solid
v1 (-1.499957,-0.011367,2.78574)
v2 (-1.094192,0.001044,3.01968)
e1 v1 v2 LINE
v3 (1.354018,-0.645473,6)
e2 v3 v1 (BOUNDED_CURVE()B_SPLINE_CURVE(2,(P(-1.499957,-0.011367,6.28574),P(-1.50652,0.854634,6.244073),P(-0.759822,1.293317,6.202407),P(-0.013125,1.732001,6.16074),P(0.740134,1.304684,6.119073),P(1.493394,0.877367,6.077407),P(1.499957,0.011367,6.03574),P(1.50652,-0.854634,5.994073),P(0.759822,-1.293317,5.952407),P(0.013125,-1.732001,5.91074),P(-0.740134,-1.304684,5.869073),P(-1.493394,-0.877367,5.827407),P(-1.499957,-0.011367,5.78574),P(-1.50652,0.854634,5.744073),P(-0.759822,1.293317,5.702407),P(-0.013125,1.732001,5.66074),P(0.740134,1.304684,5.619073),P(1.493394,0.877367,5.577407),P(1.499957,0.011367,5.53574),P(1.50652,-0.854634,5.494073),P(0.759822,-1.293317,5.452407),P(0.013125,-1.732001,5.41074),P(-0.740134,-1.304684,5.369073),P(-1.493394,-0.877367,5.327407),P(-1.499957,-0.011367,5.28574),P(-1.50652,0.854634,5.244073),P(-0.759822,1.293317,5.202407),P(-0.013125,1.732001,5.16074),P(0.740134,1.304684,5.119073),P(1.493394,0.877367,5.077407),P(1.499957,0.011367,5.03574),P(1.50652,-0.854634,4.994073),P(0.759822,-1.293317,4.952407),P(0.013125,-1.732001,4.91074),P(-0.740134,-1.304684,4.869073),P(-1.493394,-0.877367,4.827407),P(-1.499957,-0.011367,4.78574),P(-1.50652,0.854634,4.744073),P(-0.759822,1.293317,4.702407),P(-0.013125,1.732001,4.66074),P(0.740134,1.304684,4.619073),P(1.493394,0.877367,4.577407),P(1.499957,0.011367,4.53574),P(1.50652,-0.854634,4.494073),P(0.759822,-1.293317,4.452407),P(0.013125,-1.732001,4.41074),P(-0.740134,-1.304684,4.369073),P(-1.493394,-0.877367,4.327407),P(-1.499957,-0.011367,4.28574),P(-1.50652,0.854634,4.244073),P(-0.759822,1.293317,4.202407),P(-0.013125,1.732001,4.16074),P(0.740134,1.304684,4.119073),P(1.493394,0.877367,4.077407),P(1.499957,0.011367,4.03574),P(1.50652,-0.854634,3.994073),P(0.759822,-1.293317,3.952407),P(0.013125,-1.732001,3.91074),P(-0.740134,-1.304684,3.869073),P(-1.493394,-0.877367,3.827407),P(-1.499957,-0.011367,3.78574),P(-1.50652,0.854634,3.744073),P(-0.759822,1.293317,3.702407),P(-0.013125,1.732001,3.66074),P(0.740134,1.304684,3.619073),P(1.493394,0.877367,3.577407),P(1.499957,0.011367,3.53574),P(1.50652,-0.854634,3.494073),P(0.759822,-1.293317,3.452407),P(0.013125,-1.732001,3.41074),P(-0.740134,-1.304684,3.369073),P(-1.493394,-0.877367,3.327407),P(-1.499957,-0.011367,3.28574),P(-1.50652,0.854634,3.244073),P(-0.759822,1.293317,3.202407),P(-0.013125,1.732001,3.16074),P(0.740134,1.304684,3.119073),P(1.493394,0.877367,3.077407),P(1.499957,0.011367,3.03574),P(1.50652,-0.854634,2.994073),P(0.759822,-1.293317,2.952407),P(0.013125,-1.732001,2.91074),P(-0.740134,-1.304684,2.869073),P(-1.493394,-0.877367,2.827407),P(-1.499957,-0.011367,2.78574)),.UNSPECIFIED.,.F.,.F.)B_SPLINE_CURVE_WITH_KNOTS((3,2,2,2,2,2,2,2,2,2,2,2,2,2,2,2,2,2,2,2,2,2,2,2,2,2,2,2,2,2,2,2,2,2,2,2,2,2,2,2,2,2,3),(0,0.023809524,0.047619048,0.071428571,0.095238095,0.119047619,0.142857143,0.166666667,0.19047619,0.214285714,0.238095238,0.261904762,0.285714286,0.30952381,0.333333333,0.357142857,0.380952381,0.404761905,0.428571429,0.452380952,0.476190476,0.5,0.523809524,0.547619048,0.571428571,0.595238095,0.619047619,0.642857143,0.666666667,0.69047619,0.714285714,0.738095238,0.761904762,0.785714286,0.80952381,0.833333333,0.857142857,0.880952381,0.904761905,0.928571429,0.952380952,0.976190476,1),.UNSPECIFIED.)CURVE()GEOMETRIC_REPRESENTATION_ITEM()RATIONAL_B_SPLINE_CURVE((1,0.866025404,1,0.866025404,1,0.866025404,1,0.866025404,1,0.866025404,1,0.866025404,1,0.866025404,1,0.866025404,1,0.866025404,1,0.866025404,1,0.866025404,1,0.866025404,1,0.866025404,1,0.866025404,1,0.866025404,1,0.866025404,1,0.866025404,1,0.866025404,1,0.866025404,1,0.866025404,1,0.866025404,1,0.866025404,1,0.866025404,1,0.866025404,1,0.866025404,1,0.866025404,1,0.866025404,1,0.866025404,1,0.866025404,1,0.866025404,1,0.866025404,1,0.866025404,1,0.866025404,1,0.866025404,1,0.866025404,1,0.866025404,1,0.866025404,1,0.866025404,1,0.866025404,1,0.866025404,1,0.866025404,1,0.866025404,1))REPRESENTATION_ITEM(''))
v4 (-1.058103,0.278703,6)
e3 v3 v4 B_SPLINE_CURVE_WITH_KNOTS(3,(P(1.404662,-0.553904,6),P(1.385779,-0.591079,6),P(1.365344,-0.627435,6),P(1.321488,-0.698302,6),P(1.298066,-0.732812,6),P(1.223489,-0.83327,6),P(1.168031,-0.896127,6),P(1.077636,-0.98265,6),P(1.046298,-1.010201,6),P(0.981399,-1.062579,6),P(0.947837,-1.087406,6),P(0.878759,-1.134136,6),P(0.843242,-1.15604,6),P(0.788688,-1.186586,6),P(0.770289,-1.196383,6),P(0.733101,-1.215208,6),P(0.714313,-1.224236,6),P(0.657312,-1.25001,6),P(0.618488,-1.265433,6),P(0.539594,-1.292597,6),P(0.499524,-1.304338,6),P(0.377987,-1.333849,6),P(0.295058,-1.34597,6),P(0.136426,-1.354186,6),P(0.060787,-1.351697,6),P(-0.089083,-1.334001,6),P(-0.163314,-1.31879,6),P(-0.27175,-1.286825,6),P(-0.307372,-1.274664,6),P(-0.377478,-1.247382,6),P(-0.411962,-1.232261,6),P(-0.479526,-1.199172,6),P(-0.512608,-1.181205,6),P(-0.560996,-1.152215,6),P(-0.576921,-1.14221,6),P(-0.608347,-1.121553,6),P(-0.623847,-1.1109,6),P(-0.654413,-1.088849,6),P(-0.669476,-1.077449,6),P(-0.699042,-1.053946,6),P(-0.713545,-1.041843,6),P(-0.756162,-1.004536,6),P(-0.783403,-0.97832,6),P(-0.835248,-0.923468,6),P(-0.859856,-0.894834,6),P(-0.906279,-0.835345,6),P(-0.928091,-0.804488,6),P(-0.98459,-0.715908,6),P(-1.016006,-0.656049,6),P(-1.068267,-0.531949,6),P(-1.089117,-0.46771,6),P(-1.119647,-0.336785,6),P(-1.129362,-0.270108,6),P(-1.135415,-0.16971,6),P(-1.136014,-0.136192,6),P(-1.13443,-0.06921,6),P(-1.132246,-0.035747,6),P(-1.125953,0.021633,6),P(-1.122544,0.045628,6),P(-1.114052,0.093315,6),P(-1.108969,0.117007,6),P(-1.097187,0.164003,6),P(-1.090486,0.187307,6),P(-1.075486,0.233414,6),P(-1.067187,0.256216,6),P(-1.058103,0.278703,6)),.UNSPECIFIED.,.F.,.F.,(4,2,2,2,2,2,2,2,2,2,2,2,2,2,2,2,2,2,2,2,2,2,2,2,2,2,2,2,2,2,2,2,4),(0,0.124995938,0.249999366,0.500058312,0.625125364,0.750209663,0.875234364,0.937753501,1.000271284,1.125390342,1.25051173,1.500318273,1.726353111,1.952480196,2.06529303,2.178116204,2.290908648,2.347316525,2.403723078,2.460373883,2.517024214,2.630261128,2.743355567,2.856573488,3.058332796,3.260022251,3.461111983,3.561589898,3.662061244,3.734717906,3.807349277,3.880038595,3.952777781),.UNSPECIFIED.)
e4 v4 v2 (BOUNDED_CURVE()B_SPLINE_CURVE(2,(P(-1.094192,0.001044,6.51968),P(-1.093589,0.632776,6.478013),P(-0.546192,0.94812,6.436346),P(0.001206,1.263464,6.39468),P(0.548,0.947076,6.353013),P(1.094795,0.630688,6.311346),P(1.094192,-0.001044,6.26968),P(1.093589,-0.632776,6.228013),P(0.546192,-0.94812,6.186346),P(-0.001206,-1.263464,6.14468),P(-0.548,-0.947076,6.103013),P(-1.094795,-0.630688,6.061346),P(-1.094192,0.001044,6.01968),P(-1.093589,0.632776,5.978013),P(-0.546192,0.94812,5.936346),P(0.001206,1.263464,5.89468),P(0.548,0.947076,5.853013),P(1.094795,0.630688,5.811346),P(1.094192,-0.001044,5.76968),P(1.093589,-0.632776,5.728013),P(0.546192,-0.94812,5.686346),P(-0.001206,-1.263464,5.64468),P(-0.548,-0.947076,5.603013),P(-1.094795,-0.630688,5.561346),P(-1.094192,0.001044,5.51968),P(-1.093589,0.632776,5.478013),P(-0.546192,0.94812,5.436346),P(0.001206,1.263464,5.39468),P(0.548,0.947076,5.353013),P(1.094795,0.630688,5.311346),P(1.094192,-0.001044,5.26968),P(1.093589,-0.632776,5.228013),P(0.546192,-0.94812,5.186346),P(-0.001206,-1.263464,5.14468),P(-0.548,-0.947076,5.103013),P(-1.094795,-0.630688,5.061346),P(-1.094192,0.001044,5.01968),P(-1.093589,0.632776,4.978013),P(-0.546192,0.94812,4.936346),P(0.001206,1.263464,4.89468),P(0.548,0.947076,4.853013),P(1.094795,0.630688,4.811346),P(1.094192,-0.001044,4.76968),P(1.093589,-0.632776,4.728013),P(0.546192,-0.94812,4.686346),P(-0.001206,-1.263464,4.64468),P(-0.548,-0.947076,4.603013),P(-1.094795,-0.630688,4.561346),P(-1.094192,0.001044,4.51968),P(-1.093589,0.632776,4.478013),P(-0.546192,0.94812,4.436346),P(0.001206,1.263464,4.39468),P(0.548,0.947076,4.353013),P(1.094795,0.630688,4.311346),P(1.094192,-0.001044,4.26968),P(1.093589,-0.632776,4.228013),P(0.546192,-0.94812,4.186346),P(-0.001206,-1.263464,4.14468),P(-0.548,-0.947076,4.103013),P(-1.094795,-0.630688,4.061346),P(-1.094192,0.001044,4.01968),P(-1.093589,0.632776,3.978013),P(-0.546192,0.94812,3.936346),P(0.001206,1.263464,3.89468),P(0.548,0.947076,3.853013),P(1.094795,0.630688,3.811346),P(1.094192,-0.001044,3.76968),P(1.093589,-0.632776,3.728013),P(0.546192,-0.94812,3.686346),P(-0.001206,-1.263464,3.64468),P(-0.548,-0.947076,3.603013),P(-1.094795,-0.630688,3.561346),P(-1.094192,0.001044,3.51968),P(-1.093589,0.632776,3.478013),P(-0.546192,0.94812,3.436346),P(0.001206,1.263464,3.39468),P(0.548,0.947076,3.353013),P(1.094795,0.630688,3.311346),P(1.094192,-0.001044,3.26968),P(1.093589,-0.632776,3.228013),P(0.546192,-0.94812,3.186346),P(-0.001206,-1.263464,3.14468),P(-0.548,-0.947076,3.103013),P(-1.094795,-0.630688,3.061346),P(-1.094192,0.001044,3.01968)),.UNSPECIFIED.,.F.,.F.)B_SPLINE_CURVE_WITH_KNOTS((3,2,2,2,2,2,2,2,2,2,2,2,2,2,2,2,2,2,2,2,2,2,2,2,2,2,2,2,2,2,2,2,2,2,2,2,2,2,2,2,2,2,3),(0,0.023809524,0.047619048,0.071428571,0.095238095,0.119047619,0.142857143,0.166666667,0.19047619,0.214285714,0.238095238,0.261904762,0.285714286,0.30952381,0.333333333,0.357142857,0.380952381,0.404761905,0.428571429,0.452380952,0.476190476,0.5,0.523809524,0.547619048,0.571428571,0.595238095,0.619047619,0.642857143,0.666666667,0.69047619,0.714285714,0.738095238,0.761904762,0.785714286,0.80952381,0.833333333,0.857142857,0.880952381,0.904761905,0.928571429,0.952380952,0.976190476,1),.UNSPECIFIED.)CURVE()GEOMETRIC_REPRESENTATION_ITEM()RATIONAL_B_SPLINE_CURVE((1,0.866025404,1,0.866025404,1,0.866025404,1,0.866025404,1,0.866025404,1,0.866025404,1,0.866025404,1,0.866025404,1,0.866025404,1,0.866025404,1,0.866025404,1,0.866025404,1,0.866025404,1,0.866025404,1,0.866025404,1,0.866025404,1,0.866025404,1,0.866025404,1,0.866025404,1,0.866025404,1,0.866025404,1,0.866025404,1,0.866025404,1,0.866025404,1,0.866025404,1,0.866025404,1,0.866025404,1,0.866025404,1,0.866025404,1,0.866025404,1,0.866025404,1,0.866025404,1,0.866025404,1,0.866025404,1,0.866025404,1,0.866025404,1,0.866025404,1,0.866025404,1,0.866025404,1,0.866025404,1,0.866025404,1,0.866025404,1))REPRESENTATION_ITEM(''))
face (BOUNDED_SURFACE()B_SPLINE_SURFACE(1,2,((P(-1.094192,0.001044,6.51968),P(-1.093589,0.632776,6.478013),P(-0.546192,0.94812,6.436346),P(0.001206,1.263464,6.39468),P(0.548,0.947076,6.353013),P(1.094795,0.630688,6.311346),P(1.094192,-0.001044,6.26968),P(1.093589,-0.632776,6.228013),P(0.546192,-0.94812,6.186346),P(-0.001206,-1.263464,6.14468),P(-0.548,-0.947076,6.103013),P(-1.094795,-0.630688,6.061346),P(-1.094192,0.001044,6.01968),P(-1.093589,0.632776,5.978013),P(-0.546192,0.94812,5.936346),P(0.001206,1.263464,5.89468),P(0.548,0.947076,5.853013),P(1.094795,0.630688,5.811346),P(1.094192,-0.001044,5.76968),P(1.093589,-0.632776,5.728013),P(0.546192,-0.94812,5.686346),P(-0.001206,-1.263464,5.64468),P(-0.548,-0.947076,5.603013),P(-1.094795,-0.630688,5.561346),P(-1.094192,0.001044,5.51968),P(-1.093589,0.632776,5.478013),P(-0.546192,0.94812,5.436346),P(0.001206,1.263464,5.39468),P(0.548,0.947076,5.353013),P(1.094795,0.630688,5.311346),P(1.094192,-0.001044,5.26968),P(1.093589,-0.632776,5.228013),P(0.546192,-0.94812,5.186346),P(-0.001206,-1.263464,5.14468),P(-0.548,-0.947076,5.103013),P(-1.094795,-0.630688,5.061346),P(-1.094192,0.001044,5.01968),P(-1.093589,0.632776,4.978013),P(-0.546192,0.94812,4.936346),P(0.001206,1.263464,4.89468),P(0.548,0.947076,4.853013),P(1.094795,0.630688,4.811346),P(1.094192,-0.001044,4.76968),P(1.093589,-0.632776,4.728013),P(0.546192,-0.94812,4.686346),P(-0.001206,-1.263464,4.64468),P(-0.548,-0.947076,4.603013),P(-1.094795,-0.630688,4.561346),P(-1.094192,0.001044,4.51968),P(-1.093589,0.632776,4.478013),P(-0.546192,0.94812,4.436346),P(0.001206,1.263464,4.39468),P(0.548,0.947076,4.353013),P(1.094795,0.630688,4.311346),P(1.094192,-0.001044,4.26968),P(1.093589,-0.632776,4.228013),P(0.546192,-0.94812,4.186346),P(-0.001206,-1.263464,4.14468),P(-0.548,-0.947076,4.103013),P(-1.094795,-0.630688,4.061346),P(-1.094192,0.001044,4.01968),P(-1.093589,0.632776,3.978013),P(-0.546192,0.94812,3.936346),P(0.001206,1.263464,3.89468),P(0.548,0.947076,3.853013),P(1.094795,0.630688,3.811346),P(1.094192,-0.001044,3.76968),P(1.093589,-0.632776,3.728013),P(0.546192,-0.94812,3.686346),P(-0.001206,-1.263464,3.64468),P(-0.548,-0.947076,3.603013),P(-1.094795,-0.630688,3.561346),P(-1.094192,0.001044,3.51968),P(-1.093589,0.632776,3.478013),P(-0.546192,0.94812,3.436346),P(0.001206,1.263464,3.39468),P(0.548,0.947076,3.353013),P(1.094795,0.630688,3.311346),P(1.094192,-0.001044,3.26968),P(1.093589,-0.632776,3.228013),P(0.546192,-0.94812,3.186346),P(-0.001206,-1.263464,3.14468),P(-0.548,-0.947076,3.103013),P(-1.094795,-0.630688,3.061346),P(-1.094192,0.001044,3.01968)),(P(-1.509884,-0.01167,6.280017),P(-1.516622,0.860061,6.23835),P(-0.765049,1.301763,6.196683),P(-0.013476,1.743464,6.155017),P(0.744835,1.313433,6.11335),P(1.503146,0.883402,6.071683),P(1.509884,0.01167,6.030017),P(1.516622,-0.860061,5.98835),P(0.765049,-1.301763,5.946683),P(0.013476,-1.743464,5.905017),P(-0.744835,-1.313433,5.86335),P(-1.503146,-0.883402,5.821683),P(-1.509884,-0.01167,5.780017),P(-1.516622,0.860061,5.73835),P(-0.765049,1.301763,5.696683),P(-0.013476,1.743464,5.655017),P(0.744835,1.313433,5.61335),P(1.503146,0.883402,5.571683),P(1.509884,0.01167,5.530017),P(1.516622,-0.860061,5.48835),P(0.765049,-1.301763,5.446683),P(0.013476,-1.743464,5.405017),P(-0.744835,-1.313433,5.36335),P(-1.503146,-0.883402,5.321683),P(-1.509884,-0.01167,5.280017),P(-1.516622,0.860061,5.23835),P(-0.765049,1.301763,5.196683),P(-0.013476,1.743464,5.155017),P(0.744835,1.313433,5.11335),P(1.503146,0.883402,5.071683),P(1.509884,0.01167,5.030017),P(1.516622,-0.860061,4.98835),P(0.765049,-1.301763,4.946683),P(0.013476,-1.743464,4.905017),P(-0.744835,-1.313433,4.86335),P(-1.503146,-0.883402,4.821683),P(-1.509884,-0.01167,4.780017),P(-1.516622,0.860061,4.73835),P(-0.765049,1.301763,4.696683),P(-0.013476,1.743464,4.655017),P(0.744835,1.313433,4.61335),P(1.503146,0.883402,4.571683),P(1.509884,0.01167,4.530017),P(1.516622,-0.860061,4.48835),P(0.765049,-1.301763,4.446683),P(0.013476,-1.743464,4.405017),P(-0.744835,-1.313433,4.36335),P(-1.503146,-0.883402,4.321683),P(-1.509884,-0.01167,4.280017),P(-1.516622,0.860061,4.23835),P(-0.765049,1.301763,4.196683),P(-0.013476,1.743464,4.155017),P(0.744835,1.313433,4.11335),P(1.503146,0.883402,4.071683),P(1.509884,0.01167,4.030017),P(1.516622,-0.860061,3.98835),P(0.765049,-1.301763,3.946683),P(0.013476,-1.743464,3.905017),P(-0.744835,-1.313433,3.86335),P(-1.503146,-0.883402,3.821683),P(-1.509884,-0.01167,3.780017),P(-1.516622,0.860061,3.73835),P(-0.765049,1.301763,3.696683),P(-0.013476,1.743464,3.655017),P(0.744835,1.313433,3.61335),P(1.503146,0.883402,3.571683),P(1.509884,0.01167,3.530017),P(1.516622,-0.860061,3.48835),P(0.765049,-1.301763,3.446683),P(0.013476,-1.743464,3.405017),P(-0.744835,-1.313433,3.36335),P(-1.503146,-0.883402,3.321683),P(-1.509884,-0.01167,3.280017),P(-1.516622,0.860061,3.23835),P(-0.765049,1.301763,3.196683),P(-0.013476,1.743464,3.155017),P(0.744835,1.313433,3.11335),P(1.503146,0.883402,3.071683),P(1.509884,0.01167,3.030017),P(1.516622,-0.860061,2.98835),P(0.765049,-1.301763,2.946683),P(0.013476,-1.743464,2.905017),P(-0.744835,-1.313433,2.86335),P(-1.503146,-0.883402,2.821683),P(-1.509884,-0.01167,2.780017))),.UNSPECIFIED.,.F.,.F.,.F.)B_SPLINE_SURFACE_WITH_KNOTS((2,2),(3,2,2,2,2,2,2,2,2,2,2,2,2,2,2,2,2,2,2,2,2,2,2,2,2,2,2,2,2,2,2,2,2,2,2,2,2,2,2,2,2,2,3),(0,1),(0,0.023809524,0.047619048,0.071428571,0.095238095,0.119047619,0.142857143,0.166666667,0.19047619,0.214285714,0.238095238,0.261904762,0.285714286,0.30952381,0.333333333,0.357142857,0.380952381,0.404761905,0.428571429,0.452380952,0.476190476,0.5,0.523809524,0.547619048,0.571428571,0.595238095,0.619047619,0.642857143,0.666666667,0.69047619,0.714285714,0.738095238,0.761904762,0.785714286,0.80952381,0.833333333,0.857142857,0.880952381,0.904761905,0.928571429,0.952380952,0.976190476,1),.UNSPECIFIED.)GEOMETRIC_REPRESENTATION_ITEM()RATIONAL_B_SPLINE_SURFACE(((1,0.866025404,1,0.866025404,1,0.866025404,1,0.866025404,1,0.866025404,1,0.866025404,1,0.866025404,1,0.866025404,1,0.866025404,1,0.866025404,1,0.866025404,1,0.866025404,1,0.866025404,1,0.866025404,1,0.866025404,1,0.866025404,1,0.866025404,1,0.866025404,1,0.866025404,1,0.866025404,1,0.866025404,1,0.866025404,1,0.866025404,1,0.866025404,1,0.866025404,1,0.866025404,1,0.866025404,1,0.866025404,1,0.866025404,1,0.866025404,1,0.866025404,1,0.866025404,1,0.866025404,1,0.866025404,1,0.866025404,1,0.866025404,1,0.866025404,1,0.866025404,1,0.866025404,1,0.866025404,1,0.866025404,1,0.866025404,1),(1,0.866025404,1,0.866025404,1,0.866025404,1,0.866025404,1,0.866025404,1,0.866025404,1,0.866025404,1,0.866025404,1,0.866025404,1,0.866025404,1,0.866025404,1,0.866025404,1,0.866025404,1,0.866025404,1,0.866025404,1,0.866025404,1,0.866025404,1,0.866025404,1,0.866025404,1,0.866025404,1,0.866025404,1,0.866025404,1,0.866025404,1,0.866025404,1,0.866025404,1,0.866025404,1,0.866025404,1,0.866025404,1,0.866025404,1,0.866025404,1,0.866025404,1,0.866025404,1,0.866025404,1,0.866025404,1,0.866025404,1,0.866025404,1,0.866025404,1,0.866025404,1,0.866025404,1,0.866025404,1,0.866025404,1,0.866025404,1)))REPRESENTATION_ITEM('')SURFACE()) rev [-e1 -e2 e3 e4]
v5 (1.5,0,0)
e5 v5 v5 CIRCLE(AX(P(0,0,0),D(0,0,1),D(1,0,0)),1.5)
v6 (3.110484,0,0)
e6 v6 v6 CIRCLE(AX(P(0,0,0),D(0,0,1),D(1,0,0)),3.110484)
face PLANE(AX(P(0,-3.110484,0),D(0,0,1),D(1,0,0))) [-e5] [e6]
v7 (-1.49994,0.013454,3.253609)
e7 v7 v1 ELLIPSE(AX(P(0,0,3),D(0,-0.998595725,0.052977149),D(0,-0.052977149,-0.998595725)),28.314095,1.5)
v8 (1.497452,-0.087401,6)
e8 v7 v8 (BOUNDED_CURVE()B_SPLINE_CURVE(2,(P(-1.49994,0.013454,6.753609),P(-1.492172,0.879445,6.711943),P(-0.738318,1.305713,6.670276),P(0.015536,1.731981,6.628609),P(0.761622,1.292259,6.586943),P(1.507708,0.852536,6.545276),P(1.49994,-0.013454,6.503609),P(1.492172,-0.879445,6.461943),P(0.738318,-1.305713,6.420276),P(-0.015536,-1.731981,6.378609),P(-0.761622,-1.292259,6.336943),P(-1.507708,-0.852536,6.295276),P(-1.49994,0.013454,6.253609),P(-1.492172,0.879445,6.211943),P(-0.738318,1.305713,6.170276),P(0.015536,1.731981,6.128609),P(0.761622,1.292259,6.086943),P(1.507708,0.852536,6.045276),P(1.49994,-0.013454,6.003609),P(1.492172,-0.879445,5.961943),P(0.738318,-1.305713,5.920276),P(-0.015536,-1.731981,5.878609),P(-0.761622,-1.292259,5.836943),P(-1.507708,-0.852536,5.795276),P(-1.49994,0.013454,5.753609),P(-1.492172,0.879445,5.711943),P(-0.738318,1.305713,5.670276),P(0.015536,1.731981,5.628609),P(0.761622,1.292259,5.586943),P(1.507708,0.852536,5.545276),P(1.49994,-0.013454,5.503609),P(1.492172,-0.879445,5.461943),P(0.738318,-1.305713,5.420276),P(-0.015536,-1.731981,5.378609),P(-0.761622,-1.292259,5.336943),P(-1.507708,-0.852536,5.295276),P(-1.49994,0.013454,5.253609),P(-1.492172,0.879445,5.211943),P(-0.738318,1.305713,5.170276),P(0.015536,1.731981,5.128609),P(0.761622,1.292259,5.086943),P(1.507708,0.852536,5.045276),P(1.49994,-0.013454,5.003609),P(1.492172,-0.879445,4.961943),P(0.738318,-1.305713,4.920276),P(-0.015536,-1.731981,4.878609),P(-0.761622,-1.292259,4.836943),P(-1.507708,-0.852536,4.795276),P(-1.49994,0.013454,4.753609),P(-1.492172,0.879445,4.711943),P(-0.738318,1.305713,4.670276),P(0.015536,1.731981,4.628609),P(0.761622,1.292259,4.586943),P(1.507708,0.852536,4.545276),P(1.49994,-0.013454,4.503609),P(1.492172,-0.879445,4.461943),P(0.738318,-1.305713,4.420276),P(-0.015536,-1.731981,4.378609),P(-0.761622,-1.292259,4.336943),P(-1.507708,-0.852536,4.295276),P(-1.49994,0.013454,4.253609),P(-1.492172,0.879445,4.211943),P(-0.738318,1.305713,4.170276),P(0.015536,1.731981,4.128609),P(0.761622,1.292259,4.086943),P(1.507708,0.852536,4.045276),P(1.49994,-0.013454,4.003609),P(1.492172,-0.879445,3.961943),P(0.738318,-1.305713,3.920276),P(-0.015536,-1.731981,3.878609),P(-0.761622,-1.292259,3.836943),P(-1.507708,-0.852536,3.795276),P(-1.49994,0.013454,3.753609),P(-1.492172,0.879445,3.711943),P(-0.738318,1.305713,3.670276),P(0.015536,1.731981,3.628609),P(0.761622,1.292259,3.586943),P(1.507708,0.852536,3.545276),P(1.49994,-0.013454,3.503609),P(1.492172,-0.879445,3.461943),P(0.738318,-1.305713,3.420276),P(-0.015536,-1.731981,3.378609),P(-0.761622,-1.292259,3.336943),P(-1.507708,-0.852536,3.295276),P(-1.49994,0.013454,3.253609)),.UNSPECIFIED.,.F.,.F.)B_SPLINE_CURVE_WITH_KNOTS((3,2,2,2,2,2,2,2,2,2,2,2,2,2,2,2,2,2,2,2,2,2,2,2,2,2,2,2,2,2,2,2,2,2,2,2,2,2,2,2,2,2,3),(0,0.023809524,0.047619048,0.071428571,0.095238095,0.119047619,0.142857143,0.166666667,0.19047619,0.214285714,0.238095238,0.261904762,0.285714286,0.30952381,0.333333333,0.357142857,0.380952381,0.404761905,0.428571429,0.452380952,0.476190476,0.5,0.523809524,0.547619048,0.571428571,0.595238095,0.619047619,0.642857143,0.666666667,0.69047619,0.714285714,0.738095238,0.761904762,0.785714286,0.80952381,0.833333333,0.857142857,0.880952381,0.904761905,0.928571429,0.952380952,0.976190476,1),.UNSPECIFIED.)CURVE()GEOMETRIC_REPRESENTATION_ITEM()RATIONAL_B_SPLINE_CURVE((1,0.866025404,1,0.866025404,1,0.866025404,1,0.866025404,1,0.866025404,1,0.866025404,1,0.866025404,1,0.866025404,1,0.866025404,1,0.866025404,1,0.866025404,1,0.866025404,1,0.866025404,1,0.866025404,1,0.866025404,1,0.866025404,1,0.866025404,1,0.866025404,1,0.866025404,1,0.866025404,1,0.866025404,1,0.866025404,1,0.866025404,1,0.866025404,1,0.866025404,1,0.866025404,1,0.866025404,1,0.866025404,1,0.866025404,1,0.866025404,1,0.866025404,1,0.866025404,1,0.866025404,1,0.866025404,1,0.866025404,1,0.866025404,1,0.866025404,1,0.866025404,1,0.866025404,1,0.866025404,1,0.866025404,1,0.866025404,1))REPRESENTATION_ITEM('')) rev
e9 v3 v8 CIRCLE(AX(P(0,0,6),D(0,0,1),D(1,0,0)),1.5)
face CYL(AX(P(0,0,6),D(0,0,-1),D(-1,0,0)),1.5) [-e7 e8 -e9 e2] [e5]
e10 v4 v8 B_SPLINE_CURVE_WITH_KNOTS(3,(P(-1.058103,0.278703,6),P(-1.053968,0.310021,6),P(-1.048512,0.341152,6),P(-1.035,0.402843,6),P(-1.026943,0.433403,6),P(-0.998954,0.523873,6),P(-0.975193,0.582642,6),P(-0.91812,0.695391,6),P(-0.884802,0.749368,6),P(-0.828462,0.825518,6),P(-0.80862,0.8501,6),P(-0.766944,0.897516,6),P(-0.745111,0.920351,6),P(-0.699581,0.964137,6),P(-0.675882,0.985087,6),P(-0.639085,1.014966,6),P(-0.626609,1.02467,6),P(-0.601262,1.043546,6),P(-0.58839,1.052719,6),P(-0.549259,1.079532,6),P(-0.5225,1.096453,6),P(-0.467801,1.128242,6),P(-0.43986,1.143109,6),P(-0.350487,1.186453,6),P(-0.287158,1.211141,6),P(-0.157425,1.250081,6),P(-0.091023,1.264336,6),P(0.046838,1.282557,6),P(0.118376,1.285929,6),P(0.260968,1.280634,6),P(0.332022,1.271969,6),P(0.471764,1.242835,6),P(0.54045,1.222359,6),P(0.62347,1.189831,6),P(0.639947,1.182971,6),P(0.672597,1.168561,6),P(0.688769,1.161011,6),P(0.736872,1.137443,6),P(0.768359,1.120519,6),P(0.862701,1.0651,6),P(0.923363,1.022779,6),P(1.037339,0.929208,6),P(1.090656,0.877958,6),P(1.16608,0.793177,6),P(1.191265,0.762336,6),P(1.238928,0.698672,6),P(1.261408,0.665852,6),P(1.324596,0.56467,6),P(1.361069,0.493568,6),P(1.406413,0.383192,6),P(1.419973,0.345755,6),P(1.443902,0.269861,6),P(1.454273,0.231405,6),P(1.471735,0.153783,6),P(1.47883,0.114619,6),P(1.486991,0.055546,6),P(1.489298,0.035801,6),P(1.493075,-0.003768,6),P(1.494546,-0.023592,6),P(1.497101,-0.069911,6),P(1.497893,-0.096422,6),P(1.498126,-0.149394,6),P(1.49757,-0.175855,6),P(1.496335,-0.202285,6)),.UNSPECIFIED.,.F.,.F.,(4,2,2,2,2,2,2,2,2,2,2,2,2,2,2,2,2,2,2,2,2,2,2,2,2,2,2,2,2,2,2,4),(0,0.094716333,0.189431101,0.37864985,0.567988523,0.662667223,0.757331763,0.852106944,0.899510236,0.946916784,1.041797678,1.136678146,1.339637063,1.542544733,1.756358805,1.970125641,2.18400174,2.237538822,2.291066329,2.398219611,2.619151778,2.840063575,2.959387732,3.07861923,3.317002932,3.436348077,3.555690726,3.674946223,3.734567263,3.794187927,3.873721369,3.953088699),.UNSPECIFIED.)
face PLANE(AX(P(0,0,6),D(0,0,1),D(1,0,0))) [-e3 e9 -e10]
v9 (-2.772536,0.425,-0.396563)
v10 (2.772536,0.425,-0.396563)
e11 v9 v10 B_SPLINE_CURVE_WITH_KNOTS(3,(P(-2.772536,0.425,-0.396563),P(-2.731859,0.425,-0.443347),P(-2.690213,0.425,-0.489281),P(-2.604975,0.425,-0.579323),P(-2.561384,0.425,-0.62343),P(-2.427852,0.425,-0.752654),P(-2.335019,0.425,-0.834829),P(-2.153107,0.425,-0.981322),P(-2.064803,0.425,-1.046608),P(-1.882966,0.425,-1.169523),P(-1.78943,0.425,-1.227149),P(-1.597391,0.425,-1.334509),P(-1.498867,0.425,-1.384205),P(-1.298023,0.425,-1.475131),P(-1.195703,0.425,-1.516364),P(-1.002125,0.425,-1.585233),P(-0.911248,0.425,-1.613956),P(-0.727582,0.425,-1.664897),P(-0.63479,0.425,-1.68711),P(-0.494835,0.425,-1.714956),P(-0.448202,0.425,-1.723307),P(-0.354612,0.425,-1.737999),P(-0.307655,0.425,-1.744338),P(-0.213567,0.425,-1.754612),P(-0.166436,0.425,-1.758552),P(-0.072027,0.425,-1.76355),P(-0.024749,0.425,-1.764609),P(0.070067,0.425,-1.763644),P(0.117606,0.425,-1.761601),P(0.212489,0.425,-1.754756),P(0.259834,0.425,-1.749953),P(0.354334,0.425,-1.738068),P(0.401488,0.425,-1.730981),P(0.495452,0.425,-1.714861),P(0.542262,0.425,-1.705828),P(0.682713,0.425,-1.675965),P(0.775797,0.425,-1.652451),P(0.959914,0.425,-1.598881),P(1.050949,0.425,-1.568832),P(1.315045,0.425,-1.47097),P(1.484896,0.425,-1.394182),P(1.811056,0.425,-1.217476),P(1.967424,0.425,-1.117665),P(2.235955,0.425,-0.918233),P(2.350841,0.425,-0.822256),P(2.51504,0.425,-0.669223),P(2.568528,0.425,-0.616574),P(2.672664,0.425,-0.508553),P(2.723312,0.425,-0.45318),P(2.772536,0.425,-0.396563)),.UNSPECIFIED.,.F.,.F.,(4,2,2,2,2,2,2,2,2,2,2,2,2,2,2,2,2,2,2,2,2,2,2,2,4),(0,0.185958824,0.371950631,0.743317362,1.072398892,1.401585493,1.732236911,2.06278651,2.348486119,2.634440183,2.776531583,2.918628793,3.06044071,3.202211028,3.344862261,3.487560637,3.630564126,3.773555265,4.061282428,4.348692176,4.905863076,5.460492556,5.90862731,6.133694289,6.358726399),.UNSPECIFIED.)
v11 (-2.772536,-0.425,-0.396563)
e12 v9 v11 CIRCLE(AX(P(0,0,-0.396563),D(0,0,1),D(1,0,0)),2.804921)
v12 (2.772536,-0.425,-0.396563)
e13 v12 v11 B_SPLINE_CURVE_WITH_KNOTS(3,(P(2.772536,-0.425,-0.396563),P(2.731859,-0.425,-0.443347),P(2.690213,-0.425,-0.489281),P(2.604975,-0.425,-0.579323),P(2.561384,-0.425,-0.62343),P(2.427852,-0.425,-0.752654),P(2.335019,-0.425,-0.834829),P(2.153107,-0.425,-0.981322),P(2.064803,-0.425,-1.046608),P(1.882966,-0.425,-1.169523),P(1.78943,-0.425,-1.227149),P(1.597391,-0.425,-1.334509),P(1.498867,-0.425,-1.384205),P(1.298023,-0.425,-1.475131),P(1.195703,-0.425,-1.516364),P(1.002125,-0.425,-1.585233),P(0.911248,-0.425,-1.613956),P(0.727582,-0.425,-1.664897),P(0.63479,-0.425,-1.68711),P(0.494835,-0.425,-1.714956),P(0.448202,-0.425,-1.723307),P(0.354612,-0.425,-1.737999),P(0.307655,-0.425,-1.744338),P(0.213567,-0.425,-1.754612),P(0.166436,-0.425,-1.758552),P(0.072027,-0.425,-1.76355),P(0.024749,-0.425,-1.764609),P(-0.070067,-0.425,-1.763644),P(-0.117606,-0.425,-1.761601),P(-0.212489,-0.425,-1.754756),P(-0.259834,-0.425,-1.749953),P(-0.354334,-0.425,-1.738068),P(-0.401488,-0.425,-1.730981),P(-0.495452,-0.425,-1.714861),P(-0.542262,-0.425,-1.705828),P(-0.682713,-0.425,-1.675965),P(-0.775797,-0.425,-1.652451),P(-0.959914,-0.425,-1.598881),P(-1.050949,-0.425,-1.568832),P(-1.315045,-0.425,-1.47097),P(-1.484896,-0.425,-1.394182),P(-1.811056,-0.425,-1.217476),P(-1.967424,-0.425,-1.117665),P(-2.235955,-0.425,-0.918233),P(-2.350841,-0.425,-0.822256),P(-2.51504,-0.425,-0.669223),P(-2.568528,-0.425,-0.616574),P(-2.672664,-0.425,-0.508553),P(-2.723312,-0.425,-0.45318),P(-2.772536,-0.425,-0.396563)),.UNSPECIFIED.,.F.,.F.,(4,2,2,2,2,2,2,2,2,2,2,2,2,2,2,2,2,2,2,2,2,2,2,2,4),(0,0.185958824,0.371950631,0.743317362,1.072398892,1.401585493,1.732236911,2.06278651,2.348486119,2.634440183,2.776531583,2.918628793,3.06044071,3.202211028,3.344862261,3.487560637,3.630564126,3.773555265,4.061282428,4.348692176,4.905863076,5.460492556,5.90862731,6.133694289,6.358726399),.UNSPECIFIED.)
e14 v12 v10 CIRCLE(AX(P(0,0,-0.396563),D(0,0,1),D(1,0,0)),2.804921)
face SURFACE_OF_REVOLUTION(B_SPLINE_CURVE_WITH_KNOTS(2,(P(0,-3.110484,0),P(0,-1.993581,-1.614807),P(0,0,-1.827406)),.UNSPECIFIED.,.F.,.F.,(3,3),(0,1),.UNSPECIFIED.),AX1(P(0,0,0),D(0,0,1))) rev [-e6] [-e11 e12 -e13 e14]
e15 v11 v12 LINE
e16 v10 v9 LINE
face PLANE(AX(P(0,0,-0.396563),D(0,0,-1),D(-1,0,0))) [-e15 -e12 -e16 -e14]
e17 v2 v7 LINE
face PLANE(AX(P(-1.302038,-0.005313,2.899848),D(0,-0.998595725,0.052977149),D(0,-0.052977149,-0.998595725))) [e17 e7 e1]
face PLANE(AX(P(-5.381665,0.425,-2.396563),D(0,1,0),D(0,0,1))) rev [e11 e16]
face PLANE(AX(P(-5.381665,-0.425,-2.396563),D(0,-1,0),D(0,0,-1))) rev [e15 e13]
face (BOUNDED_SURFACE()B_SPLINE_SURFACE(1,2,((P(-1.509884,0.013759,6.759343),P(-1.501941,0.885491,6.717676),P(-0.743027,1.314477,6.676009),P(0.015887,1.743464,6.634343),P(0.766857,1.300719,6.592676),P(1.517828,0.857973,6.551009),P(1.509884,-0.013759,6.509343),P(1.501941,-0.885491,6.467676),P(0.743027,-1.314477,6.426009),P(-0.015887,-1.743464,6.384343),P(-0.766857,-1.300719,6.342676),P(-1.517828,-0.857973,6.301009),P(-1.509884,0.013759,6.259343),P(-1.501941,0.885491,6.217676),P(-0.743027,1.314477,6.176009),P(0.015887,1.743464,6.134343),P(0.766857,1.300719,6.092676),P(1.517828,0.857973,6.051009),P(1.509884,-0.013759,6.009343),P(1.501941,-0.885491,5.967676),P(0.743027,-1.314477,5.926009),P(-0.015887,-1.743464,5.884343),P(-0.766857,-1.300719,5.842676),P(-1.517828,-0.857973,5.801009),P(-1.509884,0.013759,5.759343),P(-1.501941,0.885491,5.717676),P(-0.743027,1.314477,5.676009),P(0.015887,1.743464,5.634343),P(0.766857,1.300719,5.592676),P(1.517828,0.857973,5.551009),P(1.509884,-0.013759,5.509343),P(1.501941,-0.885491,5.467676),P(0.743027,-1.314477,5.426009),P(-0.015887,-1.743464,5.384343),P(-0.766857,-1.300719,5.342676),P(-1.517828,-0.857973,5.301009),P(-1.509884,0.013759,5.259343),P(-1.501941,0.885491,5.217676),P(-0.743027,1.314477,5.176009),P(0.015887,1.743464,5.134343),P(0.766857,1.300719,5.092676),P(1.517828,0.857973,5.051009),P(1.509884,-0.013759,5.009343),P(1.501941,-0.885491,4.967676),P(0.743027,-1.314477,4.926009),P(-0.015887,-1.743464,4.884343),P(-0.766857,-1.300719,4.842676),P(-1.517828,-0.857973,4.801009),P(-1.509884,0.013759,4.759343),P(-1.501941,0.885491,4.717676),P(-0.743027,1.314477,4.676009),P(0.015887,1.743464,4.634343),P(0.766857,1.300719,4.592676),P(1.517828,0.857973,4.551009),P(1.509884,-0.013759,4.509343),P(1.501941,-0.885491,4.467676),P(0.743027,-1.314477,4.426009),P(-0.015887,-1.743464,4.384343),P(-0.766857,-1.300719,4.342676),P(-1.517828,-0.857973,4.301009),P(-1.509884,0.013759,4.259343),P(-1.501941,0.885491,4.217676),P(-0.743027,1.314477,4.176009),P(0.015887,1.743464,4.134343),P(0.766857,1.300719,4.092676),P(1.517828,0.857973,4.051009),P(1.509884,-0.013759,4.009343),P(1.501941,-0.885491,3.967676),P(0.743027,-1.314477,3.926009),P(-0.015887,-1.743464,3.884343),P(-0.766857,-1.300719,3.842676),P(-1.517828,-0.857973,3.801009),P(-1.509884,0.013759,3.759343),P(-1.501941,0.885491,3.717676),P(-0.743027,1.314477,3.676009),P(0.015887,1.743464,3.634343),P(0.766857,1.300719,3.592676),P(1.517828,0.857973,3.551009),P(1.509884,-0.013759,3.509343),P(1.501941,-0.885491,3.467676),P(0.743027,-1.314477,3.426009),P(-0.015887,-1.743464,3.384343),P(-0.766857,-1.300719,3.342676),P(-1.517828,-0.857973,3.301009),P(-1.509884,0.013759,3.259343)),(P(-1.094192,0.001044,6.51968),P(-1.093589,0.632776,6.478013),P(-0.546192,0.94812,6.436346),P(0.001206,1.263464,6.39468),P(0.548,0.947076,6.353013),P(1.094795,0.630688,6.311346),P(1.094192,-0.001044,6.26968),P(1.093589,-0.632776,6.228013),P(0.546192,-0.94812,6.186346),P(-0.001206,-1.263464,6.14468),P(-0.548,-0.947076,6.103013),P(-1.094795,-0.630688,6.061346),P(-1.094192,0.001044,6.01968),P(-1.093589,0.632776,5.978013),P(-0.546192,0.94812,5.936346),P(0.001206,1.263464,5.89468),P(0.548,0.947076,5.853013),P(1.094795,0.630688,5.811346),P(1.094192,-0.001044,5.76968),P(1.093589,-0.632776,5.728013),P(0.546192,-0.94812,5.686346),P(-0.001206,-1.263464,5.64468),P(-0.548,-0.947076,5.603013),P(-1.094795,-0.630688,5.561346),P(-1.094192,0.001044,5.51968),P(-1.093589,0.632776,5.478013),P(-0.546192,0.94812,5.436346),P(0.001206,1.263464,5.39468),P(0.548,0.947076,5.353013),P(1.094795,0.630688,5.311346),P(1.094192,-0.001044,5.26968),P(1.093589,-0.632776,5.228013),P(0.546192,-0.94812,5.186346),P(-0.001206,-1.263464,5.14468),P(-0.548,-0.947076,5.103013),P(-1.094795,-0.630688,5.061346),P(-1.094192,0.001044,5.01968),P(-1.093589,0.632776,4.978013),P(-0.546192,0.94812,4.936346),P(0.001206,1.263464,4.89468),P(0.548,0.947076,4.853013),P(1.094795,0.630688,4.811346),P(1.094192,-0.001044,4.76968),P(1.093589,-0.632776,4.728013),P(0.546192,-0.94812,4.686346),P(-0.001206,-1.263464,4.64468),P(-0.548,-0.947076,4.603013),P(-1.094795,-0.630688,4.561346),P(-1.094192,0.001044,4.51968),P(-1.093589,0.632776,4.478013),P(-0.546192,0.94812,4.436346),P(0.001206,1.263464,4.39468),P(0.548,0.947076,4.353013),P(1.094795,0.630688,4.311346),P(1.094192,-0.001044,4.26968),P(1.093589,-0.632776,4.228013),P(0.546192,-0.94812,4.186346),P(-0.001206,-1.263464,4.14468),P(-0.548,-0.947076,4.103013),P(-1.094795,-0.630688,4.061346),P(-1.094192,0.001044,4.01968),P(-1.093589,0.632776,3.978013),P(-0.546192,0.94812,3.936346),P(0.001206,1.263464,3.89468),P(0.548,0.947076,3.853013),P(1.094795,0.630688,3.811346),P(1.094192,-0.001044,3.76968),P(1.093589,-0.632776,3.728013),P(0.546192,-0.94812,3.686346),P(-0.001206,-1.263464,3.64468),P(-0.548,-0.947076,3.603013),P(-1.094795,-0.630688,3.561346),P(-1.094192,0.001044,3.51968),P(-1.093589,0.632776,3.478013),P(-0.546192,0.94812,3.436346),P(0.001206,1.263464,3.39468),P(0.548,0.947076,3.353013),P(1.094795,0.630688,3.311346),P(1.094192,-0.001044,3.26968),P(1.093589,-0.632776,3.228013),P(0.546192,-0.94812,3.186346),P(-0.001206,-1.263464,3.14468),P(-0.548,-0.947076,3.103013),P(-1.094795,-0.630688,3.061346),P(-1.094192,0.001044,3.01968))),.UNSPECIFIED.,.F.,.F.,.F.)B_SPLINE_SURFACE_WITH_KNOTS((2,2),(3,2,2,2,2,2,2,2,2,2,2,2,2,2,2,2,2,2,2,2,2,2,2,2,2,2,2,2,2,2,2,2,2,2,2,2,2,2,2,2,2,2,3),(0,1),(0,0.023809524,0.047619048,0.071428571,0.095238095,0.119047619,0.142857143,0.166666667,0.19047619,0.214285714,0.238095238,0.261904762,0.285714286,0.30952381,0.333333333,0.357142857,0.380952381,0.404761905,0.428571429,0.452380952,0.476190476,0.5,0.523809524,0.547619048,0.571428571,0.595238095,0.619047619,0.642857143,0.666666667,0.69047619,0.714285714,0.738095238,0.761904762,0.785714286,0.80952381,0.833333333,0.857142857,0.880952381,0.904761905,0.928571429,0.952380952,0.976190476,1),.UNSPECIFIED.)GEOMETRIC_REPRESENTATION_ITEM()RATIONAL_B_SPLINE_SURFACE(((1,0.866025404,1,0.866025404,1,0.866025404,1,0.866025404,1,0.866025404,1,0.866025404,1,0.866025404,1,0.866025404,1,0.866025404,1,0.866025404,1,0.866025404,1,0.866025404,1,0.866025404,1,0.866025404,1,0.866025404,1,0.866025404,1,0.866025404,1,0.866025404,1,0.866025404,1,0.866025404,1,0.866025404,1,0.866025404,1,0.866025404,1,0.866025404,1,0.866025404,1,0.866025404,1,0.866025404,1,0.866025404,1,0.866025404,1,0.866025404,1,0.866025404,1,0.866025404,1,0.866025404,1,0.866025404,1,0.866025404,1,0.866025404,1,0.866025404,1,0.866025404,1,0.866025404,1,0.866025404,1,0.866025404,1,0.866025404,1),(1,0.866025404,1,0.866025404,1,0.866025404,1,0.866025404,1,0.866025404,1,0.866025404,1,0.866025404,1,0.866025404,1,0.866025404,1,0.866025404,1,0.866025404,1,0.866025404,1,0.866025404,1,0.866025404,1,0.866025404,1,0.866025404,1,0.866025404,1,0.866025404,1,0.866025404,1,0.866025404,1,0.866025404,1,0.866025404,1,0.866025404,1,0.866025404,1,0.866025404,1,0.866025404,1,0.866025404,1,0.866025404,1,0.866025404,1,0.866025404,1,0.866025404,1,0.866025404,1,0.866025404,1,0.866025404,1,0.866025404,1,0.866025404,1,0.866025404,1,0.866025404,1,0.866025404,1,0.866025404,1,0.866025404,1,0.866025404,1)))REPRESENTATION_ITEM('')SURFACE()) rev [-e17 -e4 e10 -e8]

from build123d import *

# Parameters (mm, degrees)
SKETCH1_R           = 1.5
BOSS_EXTRUDE1_DEPTH = 6
CUT_SWEEP1_PITCH    = 0.5
SKETCH5_W           = 11.492043773
SKETCH5_H           = 0.85
CUT_EXTRUDE1_DEPTH  = 2


with BuildPart() as part:
    # Sketch1 → Boss-Extrude1 (new body)
    with BuildSketch(Plane.XY):
        Circle(SKETCH1_R)
    extrude(amount=BOSS_EXTRUDE1_DEPTH)

    # Cut-Sweep1: arcs per turn and ends read off the stored shape
    # Cut-Sweep1: the profile of Sketch3 screwed along a right-hand helix through 7 turns, 6 arcs to a turn; built about Z, then put on its axis
    cut_sweep1_z = Axis((0, 0, 0), (0, 0, 1))
    cut_sweep1_corners = [(1.094191853, 0.001044043, -0.519679739), (1.509884047, -0.011670473, -0.280016765), (1.509884047, 0.013758558, -0.759342713)]
    with BuildLine(mode=Mode.PRIVATE) as cut_sweep1_profile:
        Line(cut_sweep1_corners[0], cut_sweep1_corners[1])
        Line(cut_sweep1_corners[1], cut_sweep1_corners[2])
        Line(cut_sweep1_corners[2], cut_sweep1_corners[0])
    cut_sweep1_cap = Face(cut_sweep1_profile.wire())
    cut_sweep1_turn_angles = [0, 30, 60, 90, 120, 150, 180, 210, 240, 270, 300, 330, 360]
    cut_sweep1_turn_weights = [1, 0.8660254037844387, 1, 0.8660254037844387, 1, 0.8660254037844387, 1, 0.8660254037844387, 1, 0.8660254037844387, 1, 0.8660254037844387, 1]
    cut_sweep1_turn_rails = [Edge.make_bspline([Vector(p[0], p[1], 0).rotate(cut_sweep1_z, cut_sweep1_turn_angles[k]) / cut_sweep1_turn_weights[k] + Vector(0, 0, p[2] + CUT_SWEEP1_PITCH * cut_sweep1_turn_angles[k] / 360) for k in range(13)], [0, 0, 0, 1, 1, 2, 2, 3, 3, 4, 4, 5, 5, 6, 6, 6], 2, cut_sweep1_turn_weights) for p in cut_sweep1_corners]
    cut_sweep1_turn_sides = [Face.make_surface_from_curves(cut_sweep1_turn_rails[p[0]], cut_sweep1_turn_rails[p[1]]) for p in [(0, 1), (1, 2), (2, 0)]]
    cut_sweep1 = Plane(origin=(0, 0, 6), x_dir=(-1, 0, 0), z_dir=(0, 0, -1)) * Solid(Shell([*[p.moved(Location((0, 0, CUT_SWEEP1_PITCH * i))) for i in range(7) for p in cut_sweep1_turn_sides], cut_sweep1_cap, cut_sweep1_cap.rotate(cut_sweep1_z, 2520).moved(Location((0, 0, CUT_SWEEP1_PITCH * 2520 / 360)))]))
    add(cut_sweep1, mode=Mode.SUBTRACT)

    # Sketch4 → Revolve1 (revolve)
    with BuildSketch(Plane(origin=(0, 0, 0), x_dir=(0, 0, -1), z_dir=(1, 0, 0)), mode=Mode.PRIVATE) as revolve1_sk:
        with BuildLine():
            Line((0, -3.110484298), (0, 0))
            Line((0, 0), (1.827405733, 0))
            add(Edge.make_bspline(
                [(1.827405733, 0), (1.614806924, -1.993581121), (0, -3.110484298)],
                knots=[0, 0, 0, 1, 1, 1], degree=2))
        make_face()
    revolve(revolve1_sk.sketch.rotate(Axis((0, 0, 0), (0, 0, -1)), 89.565814591), axis=Axis((0, 0, 0), (0, 0, -1)))

    # Sketch5 → Cut-Extrude1 (cut)
    with BuildSketch(Plane.XY.offset(-0.396562646)):
        with Locations((0.364356631, 0)):
            Rectangle(SKETCH5_W, SKETCH5_H)
    extrude(amount=-CUT_EXTRUDE1_DEPTH, mode=Mode.SUBTRACT)


solid = part.part
